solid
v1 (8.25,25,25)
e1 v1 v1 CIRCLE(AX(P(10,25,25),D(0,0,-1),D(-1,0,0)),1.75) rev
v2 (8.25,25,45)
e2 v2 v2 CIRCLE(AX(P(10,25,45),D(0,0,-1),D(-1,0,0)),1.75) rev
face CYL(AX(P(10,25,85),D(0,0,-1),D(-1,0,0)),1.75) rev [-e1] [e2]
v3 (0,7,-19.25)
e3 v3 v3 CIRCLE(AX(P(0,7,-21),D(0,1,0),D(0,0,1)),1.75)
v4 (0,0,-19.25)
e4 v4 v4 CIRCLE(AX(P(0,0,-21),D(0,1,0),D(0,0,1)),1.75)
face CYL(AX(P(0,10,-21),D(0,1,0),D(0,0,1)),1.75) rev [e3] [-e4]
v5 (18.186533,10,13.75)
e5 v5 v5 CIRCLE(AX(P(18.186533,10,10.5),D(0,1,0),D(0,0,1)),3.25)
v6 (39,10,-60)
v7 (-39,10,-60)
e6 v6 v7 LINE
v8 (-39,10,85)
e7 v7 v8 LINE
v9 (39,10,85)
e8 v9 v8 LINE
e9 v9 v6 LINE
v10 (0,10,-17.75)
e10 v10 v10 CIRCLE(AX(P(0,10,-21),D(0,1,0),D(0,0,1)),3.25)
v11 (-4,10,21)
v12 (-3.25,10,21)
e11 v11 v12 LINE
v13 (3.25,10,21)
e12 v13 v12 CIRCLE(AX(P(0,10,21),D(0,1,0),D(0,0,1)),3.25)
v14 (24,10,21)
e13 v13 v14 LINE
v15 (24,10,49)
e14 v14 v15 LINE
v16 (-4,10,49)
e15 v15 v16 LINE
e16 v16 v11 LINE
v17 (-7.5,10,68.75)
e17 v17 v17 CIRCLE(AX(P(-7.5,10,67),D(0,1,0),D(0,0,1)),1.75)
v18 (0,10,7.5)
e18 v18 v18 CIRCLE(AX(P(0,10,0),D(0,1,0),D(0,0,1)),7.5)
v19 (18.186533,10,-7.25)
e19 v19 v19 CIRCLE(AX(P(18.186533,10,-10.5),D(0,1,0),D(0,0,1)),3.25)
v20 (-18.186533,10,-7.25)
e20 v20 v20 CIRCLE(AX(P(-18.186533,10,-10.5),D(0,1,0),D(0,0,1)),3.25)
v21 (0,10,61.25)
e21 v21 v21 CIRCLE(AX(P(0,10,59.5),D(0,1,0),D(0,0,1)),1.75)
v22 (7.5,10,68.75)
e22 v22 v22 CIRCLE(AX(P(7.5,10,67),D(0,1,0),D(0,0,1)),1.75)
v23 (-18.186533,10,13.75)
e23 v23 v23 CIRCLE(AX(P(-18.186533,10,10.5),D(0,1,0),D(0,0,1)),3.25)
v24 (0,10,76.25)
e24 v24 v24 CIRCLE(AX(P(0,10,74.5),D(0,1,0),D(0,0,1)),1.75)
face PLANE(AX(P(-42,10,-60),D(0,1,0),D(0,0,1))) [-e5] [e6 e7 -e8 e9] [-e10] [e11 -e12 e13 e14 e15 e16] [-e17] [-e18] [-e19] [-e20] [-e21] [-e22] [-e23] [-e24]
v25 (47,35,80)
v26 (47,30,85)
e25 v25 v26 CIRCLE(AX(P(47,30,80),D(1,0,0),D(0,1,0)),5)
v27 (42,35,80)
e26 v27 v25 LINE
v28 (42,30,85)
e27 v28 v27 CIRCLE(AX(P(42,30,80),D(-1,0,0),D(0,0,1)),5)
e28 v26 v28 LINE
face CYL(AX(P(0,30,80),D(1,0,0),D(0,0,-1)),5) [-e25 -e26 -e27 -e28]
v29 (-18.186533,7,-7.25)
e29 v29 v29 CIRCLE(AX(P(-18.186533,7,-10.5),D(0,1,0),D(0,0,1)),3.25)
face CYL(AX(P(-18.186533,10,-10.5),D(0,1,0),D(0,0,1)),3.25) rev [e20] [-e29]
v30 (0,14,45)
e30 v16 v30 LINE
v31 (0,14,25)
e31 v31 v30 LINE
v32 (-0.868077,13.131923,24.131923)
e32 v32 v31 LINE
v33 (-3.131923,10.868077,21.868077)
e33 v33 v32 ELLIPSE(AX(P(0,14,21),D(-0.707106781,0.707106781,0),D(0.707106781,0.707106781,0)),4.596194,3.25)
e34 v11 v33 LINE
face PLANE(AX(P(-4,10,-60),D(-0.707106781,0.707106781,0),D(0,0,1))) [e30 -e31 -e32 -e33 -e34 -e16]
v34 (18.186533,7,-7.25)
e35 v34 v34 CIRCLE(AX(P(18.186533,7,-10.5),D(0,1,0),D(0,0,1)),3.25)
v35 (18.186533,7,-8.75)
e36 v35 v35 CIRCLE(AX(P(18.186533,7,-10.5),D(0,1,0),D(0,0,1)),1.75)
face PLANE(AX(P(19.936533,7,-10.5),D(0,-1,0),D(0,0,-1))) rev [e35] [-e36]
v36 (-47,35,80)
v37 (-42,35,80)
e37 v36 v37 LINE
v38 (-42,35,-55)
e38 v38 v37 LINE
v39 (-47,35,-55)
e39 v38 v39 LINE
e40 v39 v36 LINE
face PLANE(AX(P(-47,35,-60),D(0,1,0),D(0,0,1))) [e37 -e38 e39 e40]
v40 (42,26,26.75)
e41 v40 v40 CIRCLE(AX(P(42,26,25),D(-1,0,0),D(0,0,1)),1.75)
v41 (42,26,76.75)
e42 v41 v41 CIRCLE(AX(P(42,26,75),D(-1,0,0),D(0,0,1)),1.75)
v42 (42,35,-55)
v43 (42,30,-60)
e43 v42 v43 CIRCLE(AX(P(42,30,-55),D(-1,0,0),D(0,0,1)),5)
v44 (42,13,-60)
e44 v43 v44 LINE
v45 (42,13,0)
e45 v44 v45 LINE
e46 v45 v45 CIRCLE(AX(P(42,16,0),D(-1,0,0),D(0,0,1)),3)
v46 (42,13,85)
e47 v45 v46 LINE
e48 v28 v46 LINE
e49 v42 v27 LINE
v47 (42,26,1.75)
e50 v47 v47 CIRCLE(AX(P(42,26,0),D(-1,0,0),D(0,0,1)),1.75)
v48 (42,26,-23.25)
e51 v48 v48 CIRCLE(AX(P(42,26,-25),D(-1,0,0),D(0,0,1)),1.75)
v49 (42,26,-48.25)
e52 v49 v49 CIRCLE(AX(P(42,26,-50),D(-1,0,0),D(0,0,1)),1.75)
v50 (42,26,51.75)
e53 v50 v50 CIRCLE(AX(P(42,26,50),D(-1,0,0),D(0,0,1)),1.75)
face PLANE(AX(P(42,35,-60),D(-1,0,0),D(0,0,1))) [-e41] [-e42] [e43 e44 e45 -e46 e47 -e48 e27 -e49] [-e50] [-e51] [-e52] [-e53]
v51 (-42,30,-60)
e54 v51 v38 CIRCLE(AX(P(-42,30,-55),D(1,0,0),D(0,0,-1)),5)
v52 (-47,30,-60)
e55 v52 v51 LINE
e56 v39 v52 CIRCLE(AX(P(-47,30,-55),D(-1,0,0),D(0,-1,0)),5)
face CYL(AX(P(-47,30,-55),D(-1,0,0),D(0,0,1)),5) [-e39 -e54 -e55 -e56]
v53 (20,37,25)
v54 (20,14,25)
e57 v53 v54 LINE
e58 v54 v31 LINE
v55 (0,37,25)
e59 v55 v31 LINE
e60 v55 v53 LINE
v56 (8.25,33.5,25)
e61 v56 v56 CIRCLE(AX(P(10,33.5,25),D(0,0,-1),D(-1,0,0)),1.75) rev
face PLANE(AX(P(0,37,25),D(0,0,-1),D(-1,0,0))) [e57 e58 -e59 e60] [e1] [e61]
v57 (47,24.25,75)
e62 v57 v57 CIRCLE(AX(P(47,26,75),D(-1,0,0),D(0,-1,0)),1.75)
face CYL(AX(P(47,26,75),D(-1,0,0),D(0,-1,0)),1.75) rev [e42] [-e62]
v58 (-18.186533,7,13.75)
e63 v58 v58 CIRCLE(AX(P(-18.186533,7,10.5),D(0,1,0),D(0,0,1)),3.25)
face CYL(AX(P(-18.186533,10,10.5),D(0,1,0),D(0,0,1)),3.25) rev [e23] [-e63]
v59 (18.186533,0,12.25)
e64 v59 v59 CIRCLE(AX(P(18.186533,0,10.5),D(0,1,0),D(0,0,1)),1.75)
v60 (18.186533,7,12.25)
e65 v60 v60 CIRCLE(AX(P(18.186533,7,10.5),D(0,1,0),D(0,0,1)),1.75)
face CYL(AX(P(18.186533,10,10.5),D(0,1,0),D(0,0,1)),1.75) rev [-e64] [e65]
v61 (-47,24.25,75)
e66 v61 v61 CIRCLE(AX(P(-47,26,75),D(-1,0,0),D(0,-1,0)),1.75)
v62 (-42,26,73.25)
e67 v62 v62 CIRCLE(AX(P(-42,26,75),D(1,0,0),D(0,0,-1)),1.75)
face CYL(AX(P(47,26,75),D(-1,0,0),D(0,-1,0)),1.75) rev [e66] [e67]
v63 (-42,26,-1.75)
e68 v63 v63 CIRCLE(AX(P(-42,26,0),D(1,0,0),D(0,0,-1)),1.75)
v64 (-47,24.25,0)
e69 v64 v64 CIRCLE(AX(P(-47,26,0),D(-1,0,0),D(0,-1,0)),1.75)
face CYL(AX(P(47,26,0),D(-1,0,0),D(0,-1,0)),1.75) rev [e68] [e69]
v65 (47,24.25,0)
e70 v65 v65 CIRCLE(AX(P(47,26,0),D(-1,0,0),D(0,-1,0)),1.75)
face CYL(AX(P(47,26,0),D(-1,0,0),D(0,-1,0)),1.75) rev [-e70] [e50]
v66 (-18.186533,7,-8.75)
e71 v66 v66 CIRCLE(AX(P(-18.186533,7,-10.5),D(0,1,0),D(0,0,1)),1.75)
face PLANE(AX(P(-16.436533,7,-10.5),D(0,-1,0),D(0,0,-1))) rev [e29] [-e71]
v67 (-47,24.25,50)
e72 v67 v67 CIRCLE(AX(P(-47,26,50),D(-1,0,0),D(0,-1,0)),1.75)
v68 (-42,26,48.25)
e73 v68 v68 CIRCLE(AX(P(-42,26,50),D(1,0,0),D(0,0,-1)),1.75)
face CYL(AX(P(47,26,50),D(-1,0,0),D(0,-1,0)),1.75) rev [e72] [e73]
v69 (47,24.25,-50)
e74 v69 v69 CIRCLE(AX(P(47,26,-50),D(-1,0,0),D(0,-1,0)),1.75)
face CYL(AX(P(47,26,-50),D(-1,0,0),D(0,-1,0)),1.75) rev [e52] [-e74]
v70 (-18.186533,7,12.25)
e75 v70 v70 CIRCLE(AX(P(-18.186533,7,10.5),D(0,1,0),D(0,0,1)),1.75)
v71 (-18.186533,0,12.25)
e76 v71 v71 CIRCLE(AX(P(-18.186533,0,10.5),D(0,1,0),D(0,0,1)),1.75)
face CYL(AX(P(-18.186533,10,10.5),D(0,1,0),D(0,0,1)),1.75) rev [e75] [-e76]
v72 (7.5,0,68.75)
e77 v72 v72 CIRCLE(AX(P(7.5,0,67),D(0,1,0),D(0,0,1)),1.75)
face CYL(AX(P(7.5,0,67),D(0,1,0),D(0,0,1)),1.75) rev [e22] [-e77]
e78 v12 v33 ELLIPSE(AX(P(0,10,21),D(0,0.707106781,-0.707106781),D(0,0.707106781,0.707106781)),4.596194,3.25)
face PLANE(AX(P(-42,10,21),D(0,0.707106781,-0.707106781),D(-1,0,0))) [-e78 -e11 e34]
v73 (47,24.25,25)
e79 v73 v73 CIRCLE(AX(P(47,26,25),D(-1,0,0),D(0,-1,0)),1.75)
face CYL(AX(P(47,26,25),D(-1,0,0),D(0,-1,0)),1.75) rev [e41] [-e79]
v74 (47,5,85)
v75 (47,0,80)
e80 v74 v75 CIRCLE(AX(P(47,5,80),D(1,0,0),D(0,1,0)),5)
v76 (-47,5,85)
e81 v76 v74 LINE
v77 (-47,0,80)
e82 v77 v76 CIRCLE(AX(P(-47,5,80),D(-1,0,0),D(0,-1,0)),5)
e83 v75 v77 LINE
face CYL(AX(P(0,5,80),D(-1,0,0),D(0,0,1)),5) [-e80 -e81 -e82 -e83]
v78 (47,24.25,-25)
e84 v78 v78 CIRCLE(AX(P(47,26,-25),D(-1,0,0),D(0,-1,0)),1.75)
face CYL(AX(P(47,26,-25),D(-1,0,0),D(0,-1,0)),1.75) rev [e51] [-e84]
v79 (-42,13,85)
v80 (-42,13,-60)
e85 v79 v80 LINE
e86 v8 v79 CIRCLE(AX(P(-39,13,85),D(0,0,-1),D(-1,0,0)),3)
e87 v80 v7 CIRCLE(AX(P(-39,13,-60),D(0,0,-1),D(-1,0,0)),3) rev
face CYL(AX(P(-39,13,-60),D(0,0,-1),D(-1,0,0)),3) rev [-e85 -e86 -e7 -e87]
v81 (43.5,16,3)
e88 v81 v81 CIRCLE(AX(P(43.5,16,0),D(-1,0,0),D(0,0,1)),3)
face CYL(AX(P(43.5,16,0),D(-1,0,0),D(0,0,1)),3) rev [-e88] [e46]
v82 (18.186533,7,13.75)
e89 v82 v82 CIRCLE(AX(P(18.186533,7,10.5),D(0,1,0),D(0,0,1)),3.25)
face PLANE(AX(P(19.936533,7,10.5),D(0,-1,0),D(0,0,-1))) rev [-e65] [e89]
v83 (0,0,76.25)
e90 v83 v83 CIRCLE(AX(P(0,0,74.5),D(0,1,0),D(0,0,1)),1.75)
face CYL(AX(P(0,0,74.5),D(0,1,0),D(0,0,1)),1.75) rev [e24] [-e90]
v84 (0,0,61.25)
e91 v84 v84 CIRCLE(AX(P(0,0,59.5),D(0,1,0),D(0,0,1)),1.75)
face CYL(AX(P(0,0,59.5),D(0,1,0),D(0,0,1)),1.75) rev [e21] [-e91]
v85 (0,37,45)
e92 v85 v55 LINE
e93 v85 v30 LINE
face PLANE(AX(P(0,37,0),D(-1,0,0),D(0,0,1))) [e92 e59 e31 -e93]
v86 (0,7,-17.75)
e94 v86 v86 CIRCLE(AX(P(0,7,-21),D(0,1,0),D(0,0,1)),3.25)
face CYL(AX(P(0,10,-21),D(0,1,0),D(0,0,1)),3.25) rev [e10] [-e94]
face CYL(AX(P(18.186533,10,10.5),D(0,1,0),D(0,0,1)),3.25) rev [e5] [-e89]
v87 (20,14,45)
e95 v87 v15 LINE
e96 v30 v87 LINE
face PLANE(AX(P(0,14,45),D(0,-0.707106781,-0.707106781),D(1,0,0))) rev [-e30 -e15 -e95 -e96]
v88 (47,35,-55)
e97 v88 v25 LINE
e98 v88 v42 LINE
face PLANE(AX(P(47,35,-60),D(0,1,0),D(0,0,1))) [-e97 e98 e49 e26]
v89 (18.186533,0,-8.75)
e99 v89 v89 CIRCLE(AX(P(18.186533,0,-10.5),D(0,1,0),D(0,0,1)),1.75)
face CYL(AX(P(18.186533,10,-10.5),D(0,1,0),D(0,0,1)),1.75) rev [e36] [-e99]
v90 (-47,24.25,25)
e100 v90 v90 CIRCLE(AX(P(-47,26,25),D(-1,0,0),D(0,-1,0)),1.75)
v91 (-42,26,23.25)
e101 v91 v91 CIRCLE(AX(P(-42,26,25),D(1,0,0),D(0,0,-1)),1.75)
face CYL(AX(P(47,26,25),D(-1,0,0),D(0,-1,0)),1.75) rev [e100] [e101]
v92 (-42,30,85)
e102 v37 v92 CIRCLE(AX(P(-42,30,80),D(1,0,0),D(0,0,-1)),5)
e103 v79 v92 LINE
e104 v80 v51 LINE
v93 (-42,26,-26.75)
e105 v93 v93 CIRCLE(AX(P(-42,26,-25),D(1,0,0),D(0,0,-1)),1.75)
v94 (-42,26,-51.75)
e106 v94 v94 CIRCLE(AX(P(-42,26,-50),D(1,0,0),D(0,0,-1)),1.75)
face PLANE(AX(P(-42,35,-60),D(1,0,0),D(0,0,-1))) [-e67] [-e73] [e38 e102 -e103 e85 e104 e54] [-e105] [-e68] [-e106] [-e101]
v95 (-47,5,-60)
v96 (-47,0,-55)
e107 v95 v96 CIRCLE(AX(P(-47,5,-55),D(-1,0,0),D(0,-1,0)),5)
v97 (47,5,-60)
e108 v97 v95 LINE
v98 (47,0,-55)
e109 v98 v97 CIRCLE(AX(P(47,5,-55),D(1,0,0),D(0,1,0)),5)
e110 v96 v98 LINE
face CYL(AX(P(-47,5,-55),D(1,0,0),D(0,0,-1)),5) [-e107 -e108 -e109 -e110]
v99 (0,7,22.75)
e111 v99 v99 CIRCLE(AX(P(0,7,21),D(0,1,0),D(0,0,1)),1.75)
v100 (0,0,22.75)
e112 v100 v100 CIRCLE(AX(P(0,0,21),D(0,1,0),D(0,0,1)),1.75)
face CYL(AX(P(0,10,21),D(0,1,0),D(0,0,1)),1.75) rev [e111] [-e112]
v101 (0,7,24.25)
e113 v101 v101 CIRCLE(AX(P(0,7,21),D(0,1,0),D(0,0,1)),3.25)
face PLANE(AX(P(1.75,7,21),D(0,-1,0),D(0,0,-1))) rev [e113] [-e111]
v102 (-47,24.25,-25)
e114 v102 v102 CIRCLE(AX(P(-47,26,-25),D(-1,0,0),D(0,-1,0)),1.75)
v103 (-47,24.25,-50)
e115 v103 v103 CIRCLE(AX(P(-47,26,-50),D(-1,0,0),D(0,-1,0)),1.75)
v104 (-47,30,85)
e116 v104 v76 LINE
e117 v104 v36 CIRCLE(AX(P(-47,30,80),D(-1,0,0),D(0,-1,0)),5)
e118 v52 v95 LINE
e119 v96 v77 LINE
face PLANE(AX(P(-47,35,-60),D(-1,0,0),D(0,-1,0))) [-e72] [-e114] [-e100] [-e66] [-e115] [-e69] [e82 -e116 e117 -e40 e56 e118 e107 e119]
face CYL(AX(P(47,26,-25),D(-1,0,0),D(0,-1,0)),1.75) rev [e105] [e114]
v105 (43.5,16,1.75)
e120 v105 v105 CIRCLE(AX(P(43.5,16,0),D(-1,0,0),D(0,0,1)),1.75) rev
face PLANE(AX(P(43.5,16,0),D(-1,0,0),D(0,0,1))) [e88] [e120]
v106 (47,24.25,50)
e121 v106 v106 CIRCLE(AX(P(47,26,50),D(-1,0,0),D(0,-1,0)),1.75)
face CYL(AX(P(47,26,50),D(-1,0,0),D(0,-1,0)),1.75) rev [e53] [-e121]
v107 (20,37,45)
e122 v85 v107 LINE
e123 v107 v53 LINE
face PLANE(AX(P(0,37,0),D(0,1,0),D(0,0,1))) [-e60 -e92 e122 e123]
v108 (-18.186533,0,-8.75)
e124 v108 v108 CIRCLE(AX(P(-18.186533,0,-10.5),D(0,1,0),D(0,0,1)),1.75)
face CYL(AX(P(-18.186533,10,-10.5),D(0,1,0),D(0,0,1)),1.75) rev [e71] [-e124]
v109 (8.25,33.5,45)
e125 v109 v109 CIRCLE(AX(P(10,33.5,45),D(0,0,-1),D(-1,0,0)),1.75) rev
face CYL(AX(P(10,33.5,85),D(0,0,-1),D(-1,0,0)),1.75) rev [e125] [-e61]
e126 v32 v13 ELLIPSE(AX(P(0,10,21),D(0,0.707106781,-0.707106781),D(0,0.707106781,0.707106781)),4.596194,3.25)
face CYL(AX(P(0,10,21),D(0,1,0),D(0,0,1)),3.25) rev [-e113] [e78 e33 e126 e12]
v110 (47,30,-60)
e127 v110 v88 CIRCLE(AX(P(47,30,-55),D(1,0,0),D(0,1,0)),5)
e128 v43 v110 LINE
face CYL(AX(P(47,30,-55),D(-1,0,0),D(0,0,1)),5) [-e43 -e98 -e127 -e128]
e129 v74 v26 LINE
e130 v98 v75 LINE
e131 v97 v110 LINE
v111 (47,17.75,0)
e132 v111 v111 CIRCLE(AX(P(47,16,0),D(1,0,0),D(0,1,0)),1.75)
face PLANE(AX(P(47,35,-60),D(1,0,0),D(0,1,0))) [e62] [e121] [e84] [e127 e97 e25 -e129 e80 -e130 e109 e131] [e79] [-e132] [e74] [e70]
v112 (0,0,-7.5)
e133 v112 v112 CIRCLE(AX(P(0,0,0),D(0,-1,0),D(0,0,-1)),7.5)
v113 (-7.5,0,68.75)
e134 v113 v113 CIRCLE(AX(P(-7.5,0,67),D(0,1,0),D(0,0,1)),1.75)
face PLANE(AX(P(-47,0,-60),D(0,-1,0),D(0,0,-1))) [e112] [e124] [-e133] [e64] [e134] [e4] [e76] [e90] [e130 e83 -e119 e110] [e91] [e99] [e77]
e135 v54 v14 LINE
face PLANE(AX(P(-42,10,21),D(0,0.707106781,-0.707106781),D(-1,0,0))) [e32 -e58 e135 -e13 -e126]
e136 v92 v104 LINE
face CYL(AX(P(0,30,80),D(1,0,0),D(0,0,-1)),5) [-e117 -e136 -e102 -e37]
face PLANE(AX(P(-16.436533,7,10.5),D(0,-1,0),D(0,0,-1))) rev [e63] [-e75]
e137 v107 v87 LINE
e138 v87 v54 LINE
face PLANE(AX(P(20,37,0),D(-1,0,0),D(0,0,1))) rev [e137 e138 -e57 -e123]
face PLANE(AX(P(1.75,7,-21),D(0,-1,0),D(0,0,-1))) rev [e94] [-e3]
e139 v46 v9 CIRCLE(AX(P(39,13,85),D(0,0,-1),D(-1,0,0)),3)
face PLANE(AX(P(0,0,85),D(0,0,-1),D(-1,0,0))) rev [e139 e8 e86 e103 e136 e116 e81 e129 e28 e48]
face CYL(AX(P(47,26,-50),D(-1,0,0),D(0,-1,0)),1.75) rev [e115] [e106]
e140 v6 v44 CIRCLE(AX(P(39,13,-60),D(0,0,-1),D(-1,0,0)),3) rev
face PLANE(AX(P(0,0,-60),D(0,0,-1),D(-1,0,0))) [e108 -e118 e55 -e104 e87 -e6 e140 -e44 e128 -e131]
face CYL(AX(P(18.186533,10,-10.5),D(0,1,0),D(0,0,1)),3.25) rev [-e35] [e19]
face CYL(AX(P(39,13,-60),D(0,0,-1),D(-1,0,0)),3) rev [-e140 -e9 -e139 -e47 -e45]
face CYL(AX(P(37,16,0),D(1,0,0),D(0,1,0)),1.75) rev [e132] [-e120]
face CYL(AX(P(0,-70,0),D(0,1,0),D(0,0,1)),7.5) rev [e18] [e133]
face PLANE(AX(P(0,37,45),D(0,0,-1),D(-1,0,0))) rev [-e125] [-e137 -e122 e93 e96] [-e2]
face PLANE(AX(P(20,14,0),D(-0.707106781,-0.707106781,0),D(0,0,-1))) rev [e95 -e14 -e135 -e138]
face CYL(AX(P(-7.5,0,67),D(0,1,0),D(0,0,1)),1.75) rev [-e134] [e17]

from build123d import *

# Parameters (mm, degrees)
BOSS_EXTRUDE1_DEPTH            = 85
BOSS_EXTRUDE1_DEPTH_BACK       = 60
SKETCH4_R                      = 7.5
CUT_EXTRUDE1_DEPTH             = 80
CBORE_FOR_M3_SHCS1_D           = 3.5
CBORE_FOR_M3_SHCS1_CBORE_D     = 6.5
CBORE_FOR_M3_SHCS1_CBORE_DEPTH = 3
CIRPATTERN1_COUNT              = 6
SKETCH5_R                      = 1.75
CUT_EXTRUDE2_DEPTH             = 132.476233594
LPATTERN1_COUNT                = 6
LPATTERN1_PITCH                = 25
SKETCH6_R                      = 1.75
CUT_EXTRUDE3_DEPTH             = 101.294566154
FILLET1_R                      = 5
FILLET2_R                      = 3
SKETCH9_R                      = 1.75
CUT_EXTRUDE6_DEPTH             = 10
SKETCH10_R                     = 3
CUT_EXTRUDE7_DEPTH             = 1.5
SKETCH11_W                     = 20
SKETCH11_H                     = 20
BOSS_EXTRUDE2_DEPTH            = 27
SKETCH12_R                     = 1.75
CUT_EXTRUDE8_DEPTH             = 104.937481209
CHAMFER1_SIZE                  = 4


with BuildPart() as part:
    # Sketch1 → Boss-Extrude1 (new, two sides: drawn at the far end of the back side and taken through both)
    with BuildSketch(Plane.XY.offset(-BOSS_EXTRUDE1_DEPTH_BACK)):
        Polygon((-47, 35), (-47, 0), (47, 0), (47, 35), (42, 35), (42, 10), (-42, 10), (-42, 35), align=None)
    extrude(amount=BOSS_EXTRUDE1_DEPTH + BOSS_EXTRUDE1_DEPTH_BACK)

    # Sketch4 → Cut-Extrude1 (cut)
    with BuildSketch(Plane(origin=(0, 10, 0), x_dir=(1, 0, 0), z_dir=(0, 1, 0))):
        with Locations(Location((0, 0, 0), (0, 0, 270))):
            Circle(SKETCH4_R)
    extrude(amount=-CUT_EXTRUDE1_DEPTH, mode=Mode.SUBTRACT)

    # CBORE for M3 SHCS1 (through all)
    with Locations(Plane(origin=(0, 10, 0), x_dir=(1, 0, 0), z_dir=(0, 1, 0))):
        with Locations((0, 21)):
            cbore_for_m3_shcs1 = CounterBoreHole(CBORE_FOR_M3_SHCS1_D / 2, CBORE_FOR_M3_SHCS1_CBORE_D / 2, CBORE_FOR_M3_SHCS1_CBORE_DEPTH)

    # CirPattern1: CBORE for M3 SHCS1 ×6 about axis
    cirpattern1_axis = Axis((0, 0, 0), (0, 1, 0))
    for i in range(1, CIRPATTERN1_COUNT):
        add(cbore_for_m3_shcs1.rotate(cirpattern1_axis, i * 360 / CIRPATTERN1_COUNT), mode=Mode.SUBTRACT)

    # Sketch5 → Cut-Extrude2 (cut, through all)
    with BuildSketch(Plane.ZY.offset(47)):
        with Locations(Location((-50, 26, 0), (0, 0, 270))):
            Circle(SKETCH5_R)
    cut_extrude2 = extrude(amount=-CUT_EXTRUDE2_DEPTH, mode=Mode.SUBTRACT)

    # LPattern1: Cut-Extrude2 ×6
    with Locations(*[(0, 0, i * LPATTERN1_PITCH) for i in range(1, LPATTERN1_COUNT)]):
        add(cut_extrude2, mode=Mode.SUBTRACT)

    # Sketch6 → Cut-Extrude3 (cut, through all)
    with BuildSketch(Plane(origin=(0, 10, 0), x_dir=(1, 0, 0), z_dir=(0, 1, 0))):
        with Locations(Location((0, -59.5, 0), (0, 0, 270))):
            Circle(SKETCH6_R)
        with Locations(Location((7.5, -67, 0), (0, 0, 270))):
            Circle(SKETCH6_R)
        with Locations(Location((0, -74.5, 0), (0, 0, 270))):
            Circle(SKETCH6_R)
        with Locations(Location((-7.5, -67, 0), (0, 0, 270))):
            Circle(SKETCH6_R)
    extrude(amount=-CUT_EXTRUDE3_DEPTH, mode=Mode.SUBTRACT)

    # Fillet1
    fillet1_edges = [part.edges().sort_by_distance(p)[0] for p in [
        (0, 0, -60),
        (44.5, 35, -60),
        (-44.5, 35, 85),
        (0, 0, 85),
        (44.5, 35, 85),
        (-44.5, 35, -60),
    ]]
    fillet(fillet1_edges, radius=FILLET1_R)

    # Fillet2
    fillet2_edges = [part.edges().sort_by_distance(p)[0] for p in [
        (-42, 10, 12.5),
        (42, 10, 12.5),
    ]]
    fillet(fillet2_edges, radius=FILLET2_R)

    # Sketch9 → Cut-Extrude6 (cut)
    with BuildSketch(Plane(origin=(47, 0, 0), x_dir=(0, 0, -1), z_dir=(1, 0, 0))):
        with Locations(Location((0, 16, 0), (0, 0, 90))):
            Circle(SKETCH9_R)
    extrude(amount=-CUT_EXTRUDE6_DEPTH, mode=Mode.SUBTRACT)

    # Sketch10 → Cut-Extrude7 (cut)
    with BuildSketch(Plane.ZY.offset(-42)):
        with Locations((0, 16)):
            Circle(SKETCH10_R)
    extrude(amount=-CUT_EXTRUDE7_DEPTH, mode=Mode.SUBTRACT)

    # Sketch11 → Boss-Extrude2 (add)
    with BuildSketch(Plane(origin=(0, 10, 0), x_dir=(1, 0, 0), z_dir=(0, 1, 0))):
        with Locations((10, -35)):
            Rectangle(SKETCH11_W, SKETCH11_H)
    extrude(amount=BOSS_EXTRUDE2_DEPTH)

    # Sketch12 → Cut-Extrude8 (cut, through all)
    with BuildSketch(Plane.XY):
        with Locations(Location((10, 25, 0), (0, 0, 180))):
            Circle(SKETCH12_R)
        with Locations(Location((10, 33.5, 0), (0, 0, 180))):
            Circle(SKETCH12_R)
    extrude(amount=CUT_EXTRUDE8_DEPTH, mode=Mode.SUBTRACT)

    # Chamfer1
    # the kernel refuses this chamfer: 4 mm, written as the material it adds along each edge
    with BuildSketch(Plane(origin=(0, 10, 45), x_dir=(0, -0.02749587661058651, 0.9996219169112968), z_dir=(1, 0, 0)), Plane(origin=(20, 10, 45), x_dir=(0.9996219169112968, -0.027495876610586487, 0), z_dir=(0, 0, -1)), Plane(origin=(0, 10, 25), x_dir=(-0.9996219169112968, -0.02749587661058648, 0), z_dir=(0, 0, 1))) as chamfer1_piece_1:
        Polygon((CHAMFER1_SIZE * 0.999621916911, -CHAMFER1_SIZE * 0.0274958766106), (-CHAMFER1_SIZE * 0.0274958766106, -CHAMFER1_SIZE * 0.999621916911), (0, 0), align=None)
    extrude(amount=20)
    with BuildSketch(Plane(origin=(20, 10, 25), x_dir=(0, -0.027495876610586487, -0.9996219169112968), z_dir=(-1, 0, 0))) as chamfer1_piece_2_section:
        Polygon((CHAMFER1_SIZE * 0.999621916911, -CHAMFER1_SIZE * 0.0274958766106), (-CHAMFER1_SIZE * 0.0274958766106, -CHAMFER1_SIZE * 0.999621916911), (0, 0), align=None)
    chamfer1_piece_2 = extrude(amount=20, mode=Mode.PRIVATE)
    chamfer1_piece_2 = chamfer1_piece_2 - Plane(origin=(0, 11.352573601, 21), x_dir=(-1, 0, 0), z_dir=(0, 1, 0)) * Cylinder(3.25, 56, mode=Mode.PRIVATE)
    add(chamfer1_piece_2)
    with BuildSketch(Plane(origin=(0, 10, 25), x_dir=(-0.9996219169112968, -0.02749587661058648, 0), z_dir=(0, 0, 1))) as chamfer1_piece_3a_section:
        Polygon((CHAMFER1_SIZE * 0.999621916911, -CHAMFER1_SIZE * 0.0274958766106), (-CHAMFER1_SIZE * 0.0274958766106, -CHAMFER1_SIZE * 0.999621916911), (0, 0), align=None)
    chamfer1_piece_3a = extrude(amount=30.286731952, mode=Mode.PRIVATE)
    chamfer1_piece_3a = split(chamfer1_piece_3a, bisect_by=Plane(origin=(-1.319174507, 11.319174507, 45), z_dir=(0, 0, 1)), keep=Keep.TOP, mode=Mode.PRIVATE)
    with BuildSketch(Plane(origin=(-10.286731952, 10, 45), x_dir=(0, -0.02749587661058651, 0.9996219169112968), z_dir=(1, 0, 0))) as chamfer1_piece_3b_section:
        Polygon((CHAMFER1_SIZE * 0.999621916911, -CHAMFER1_SIZE * 0.0274958766106), (-CHAMFER1_SIZE * 0.0274958766106, -CHAMFER1_SIZE * 0.999621916911), (0, 0), align=None)
    chamfer1_piece_3b = extrude(amount=30.286731952, mode=Mode.PRIVATE)
    chamfer1_piece_3b = split(chamfer1_piece_3b, bisect_by=Plane(origin=(0, 11.319174507, 46.319174507), z_dir=(-1, 0, 0)), keep=Keep.TOP, mode=Mode.PRIVATE)
    chamfer1_piece_3 = chamfer1_piece_3a & chamfer1_piece_3b
    add(chamfer1_piece_3)
    with BuildSketch(Plane(origin=(20, 10, 55.286731952), x_dir=(0.9996219169112968, -0.027495876610586487, 0), z_dir=(0, 0, -1))) as chamfer1_piece_4a_section:
        Polygon((CHAMFER1_SIZE * 0.999621916911, -CHAMFER1_SIZE * 0.0274958766106), (-CHAMFER1_SIZE * 0.0274958766106, -CHAMFER1_SIZE * 0.999621916911), (0, 0), align=None)
    chamfer1_piece_4a = extrude(amount=30.286731952, mode=Mode.PRIVATE)
    chamfer1_piece_4a = split(chamfer1_piece_4a, bisect_by=Plane(origin=(21.319174507, 11.319174507, 45), z_dir=(0, 0, 1)), keep=Keep.TOP, mode=Mode.PRIVATE)
    with BuildSketch(Plane(origin=(0, 10, 45), x_dir=(0, -0.02749587661058651, 0.9996219169112968), z_dir=(1, 0, 0))) as chamfer1_piece_4b_section:
        Polygon((CHAMFER1_SIZE * 0.999621916911, -CHAMFER1_SIZE * 0.0274958766106), (-CHAMFER1_SIZE * 0.0274958766106, -CHAMFER1_SIZE * 0.999621916911), (0, 0), align=None)
    chamfer1_piece_4b = extrude(amount=30.286731952, mode=Mode.PRIVATE)
    chamfer1_piece_4b = split(chamfer1_piece_4b, bisect_by=Plane(origin=(20, 11.319174507, 46.319174507), z_dir=(1, 0, 0)), keep=Keep.TOP, mode=Mode.PRIVATE)
    chamfer1_piece_4 = chamfer1_piece_4a & chamfer1_piece_4b
    add(chamfer1_piece_4)
    with BuildSketch(Plane(origin=(30.286731952, 10, 25), x_dir=(0, -0.027495876610586487, -0.9996219169112968), z_dir=(-1, 0, 0))) as chamfer1_piece_5a_section:
        Polygon((CHAMFER1_SIZE * 0.999621916911, -CHAMFER1_SIZE * 0.0274958766106), (-CHAMFER1_SIZE * 0.0274958766106, -CHAMFER1_SIZE * 0.999621916911), (0, 0), align=None)
    chamfer1_piece_5a = extrude(amount=30.286731952, mode=Mode.PRIVATE)
    chamfer1_piece_5a = split(chamfer1_piece_5a, bisect_by=Plane(origin=(20, 11.319174507, 23.680825493), z_dir=(1, 0, 0)), keep=Keep.TOP, mode=Mode.PRIVATE)
    with BuildSketch(Plane(origin=(20, 10, 45), x_dir=(0.9996219169112968, -0.027495876610586487, 0), z_dir=(0, 0, -1))) as chamfer1_piece_5b_section:
        Polygon((CHAMFER1_SIZE * 0.999621916911, -CHAMFER1_SIZE * 0.0274958766106), (-CHAMFER1_SIZE * 0.0274958766106, -CHAMFER1_SIZE * 0.999621916911), (0, 0), align=None)
    chamfer1_piece_5b = extrude(amount=30.286731952, mode=Mode.PRIVATE)
    chamfer1_piece_5b = split(chamfer1_piece_5b, bisect_by=Plane(origin=(21.319174507, 11.319174507, 25), z_dir=(0, 0, -1)), keep=Keep.TOP, mode=Mode.PRIVATE)
    chamfer1_piece_5 = chamfer1_piece_5a & chamfer1_piece_5b
    add(chamfer1_piece_5)
    with BuildSketch(Plane(origin=(0, 10, 14.713268048), x_dir=(-0.9996219169112968, -0.027495876610586494, 0), z_dir=(0, 0, 1))) as chamfer1_piece_6a_section:
        Polygon((CHAMFER1_SIZE * 0.999621916911, -CHAMFER1_SIZE * 0.0274958766106), (-CHAMFER1_SIZE * 0.0274958766106, -CHAMFER1_SIZE * 0.999621916911), (0, 0), align=None)
    chamfer1_piece_6a = extrude(amount=30.286731952, mode=Mode.PRIVATE)
    chamfer1_piece_6a = chamfer1_piece_6a - Plane(origin=(0, 10.566435826, 21), x_dir=(-1, 0, 0), z_dir=(0, 1, 0)) * Cylinder(3.25, 77, mode=Mode.PRIVATE)
    chamfer1_piece_6a = split(chamfer1_piece_6a, bisect_by=Plane(origin=(-3.383951939, 10.566435826, 25), z_dir=(0, 0, -1)), keep=Keep.TOP, mode=Mode.PRIVATE)
    with BuildSketch(Plane(origin=(20, 10, 25), x_dir=(0, -0.027495876610586487, -0.9996219169112968), z_dir=(-1, 0, 0))) as chamfer1_piece_6b_section:
        Polygon((CHAMFER1_SIZE * 0.999621916911, -CHAMFER1_SIZE * 0.0274958766106), (-CHAMFER1_SIZE * 0.0274958766106, -CHAMFER1_SIZE * 0.999621916911), (0, 0), align=None)
    chamfer1_piece_6b = extrude(amount=30.286731952, mode=Mode.PRIVATE)
    chamfer1_piece_6b = chamfer1_piece_6b - Plane(origin=(0, 11.389114273, 21), x_dir=(-1, 0, 0), z_dir=(0, 1, 0)) * Cylinder(3.25, 77, mode=Mode.PRIVATE)
    chamfer1_piece_6b = split(chamfer1_piece_6b, bisect_by=Plane(origin=(0, 11.389114273, 23.812991609), z_dir=(-1, 0, 0)), keep=Keep.TOP, mode=Mode.PRIVATE)
    chamfer1_piece_6 = chamfer1_piece_6a & chamfer1_piece_6b
    add(chamfer1_piece_6)


solid = part.part
